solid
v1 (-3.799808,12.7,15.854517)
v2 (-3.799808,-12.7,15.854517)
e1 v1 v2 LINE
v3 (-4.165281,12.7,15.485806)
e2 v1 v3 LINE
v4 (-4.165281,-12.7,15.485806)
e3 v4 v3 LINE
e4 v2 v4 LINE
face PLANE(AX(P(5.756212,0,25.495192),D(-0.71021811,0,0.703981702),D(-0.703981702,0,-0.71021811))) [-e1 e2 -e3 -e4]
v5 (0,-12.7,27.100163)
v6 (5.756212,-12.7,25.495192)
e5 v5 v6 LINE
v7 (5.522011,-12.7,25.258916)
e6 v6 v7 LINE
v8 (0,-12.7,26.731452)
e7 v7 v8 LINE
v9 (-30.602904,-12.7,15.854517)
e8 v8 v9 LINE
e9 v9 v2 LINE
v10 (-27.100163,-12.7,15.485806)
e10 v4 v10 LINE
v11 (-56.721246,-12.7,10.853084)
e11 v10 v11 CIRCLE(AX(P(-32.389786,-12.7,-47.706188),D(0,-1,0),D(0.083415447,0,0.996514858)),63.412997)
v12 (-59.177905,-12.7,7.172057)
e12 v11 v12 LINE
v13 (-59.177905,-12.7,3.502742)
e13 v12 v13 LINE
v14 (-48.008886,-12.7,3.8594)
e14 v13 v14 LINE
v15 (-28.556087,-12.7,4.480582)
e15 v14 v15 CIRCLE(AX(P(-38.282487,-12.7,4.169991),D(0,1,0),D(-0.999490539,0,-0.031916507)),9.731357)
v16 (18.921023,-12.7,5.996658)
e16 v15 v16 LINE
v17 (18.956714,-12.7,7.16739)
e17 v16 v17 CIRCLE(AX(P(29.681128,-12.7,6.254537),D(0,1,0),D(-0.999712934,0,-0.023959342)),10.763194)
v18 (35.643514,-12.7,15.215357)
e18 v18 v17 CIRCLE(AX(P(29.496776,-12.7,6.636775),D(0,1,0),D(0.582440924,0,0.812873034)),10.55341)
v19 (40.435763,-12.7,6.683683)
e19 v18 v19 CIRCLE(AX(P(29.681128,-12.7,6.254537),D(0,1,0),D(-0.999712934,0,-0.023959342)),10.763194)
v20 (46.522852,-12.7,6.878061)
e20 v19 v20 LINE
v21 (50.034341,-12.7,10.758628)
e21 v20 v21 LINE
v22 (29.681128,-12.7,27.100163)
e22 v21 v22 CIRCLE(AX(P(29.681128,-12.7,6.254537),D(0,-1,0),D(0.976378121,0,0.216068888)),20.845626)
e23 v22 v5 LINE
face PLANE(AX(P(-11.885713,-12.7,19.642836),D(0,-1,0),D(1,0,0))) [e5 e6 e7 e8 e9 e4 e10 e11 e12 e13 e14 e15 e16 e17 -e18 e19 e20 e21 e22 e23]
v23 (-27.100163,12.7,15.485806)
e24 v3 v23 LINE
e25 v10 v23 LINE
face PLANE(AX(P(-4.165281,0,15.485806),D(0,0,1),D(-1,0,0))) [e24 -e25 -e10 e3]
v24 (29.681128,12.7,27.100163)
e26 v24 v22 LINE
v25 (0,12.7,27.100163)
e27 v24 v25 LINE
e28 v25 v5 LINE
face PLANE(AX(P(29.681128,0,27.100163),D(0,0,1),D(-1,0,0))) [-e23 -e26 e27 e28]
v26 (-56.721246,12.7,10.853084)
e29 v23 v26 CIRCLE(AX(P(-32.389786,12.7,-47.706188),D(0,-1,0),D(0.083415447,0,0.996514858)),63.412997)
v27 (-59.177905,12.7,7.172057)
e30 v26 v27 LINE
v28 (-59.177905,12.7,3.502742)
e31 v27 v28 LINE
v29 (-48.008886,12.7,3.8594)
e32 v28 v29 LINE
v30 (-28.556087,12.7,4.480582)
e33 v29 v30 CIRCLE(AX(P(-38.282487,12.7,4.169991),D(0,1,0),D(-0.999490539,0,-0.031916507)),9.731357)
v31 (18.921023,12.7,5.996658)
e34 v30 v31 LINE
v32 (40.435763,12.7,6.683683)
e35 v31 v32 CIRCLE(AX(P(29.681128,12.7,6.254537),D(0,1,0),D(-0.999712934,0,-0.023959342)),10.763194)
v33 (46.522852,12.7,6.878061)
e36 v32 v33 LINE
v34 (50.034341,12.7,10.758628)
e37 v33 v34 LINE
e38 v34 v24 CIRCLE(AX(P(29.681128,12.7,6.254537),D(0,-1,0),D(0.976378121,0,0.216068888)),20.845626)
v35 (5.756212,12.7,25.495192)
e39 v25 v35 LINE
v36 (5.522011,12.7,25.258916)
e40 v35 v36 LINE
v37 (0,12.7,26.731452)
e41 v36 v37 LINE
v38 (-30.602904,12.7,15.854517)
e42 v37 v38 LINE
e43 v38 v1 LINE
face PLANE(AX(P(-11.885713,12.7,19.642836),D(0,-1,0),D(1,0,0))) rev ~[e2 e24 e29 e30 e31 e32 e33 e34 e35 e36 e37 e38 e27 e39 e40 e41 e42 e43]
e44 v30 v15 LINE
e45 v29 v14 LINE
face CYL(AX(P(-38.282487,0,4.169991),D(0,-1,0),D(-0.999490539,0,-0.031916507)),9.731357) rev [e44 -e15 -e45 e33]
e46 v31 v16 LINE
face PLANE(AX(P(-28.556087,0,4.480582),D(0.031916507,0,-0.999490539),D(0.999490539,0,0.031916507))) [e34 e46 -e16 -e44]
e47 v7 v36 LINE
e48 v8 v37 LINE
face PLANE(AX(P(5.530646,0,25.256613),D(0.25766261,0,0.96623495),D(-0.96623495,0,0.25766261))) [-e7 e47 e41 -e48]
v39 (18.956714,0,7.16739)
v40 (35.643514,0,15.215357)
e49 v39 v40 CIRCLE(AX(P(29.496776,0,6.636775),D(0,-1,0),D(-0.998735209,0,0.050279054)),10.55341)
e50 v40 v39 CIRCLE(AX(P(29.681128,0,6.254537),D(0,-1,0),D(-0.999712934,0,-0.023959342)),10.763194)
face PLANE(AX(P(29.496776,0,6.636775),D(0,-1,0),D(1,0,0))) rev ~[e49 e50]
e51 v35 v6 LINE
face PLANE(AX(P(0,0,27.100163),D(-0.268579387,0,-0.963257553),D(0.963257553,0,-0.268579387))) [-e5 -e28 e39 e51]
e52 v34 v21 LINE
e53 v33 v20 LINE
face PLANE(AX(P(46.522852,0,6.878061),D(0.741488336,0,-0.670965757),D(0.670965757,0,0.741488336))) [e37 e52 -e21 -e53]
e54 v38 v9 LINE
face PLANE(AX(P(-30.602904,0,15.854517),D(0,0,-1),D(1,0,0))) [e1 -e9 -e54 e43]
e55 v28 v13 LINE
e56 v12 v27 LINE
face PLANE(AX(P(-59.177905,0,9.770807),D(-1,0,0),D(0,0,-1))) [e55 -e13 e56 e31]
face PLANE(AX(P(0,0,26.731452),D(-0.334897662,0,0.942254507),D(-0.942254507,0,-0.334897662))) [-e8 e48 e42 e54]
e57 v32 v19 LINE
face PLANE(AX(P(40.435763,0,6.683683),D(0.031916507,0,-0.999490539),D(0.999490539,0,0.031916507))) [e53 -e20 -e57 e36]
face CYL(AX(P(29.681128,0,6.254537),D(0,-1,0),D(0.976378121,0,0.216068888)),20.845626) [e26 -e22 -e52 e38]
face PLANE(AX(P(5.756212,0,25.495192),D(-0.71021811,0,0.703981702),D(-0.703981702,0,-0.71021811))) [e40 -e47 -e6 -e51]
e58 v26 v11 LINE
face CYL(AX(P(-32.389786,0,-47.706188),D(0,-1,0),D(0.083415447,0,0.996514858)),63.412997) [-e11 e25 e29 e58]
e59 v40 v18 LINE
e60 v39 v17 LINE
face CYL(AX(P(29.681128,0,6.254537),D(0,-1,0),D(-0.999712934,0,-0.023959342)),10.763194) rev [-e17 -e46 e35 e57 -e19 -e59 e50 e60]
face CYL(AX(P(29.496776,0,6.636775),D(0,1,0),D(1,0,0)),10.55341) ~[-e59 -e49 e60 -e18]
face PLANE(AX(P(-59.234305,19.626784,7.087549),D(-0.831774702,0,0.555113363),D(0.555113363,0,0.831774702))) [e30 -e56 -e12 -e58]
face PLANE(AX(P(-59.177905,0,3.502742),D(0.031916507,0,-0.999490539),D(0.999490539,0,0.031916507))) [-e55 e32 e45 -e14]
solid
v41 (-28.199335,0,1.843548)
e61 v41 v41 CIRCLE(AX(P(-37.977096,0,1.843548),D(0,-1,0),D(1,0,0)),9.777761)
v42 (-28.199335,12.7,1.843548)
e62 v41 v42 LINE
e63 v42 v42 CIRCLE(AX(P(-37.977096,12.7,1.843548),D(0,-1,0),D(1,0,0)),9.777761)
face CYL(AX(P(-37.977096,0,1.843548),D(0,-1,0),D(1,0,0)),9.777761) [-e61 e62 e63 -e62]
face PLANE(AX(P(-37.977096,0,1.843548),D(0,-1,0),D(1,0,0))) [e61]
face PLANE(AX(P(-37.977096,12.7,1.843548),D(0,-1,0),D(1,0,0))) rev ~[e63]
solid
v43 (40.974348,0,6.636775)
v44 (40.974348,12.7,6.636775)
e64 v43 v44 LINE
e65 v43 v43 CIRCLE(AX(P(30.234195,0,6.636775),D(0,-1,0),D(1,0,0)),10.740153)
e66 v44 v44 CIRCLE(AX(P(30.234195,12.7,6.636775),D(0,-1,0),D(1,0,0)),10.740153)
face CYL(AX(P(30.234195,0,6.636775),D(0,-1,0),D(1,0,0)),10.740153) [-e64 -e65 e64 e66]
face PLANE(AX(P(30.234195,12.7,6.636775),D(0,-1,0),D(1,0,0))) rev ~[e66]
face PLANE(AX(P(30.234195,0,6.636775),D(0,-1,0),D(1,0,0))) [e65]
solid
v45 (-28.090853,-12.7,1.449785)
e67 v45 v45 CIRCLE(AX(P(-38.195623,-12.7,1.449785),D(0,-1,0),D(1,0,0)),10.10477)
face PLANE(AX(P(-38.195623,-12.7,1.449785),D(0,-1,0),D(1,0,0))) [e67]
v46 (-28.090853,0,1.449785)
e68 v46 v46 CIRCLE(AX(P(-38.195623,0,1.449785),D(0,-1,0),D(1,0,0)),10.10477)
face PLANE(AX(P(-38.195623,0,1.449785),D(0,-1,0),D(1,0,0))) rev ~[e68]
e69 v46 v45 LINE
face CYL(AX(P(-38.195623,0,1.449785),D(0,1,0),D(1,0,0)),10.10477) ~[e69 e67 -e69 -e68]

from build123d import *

# Parameters (mm, degrees)
F1_DEPTH     = 12.7
F2_R         = 10.1047698041
F3_DEPTH     = 12.7
F4_R         = 10.5534100151
F5_DEPTH     = 12.7
F6_R         = 10.7401525204
F7_DEPTH     = 12.7
F6_R_2       = 9.7777609661
F9_DEPTH     = 12.7
F10_T1_DEPTH = 39.2535672139


# Not quite as in the source:
# - a fillet or chamfer that OpenCascade refuses, or shapes differently, is made with other operations: its cross-section is extruded or revolved along the edge and cut away or added


with BuildPart() as f1:
    # F0 (on Front) → F1 (new body, symmetric)
    with BuildSketch(Plane.XZ):
        with BuildLine():
            Line((-59.1779053211, 9.7708068788), (-59.1779053211, 3.5027421545))
            Line((-59.1779053211, 3.5027421545), (-48.0088856633, 3.8593999503))
            ThreePointArc((-48.0088856633, 3.8593999503), (-38.5930774629, 13.8963899871), (-28.5560874262, 4.4805817867))
            Line((-28.5560874262, 4.4805817867), (18.9210229876, 5.9966576886))
            ThreePointArc((18.9210229876, 5.9966576886), (29.3376039545, 17.0122475888), (40.4357630105, 6.6836830489))
            Line((40.4357630105, 6.6836830489), (46.5228520607, 6.8780606962))
            Line((46.5228520607, 6.8780606962), (50.0343405137, 10.7586279268))
            ThreePointArc((50.0343405137, 10.7586279268), (42.7319803073, 22.5092393875), (29.6811275184, 27.1001625806))
            Line((29.6811275184, 27.1001625806), (0, 27.1001625806))
            Line((0, 27.1001625806), (5.7562123984, 25.495192036))
            Line((5.7562123984, 25.495192036), (-4.165281076, 15.4858063906))
            Line((-4.165281076, 15.4858063906), (-27.1001625806, 15.4858063906))
            ThreePointArc((-27.1001625806, 15.4858063906), (-43.5123592841, 14.7237458338), (-59.1779053211, 9.7708068788))
        make_face()
    extrude(amount=F1_DEPTH, both=True)

    # F4 (on Front) → F5 (join)
    with BuildSketch(Plane.XZ):
        with Locations((29.4967759401, 6.6367746331)):
            Circle(F4_R)
    extrude(amount=F5_DEPTH)

    # F8 (on Front) → F9 (join, symmetric)
    with BuildSketch(Plane.XZ):
        Polygon((0, 26.7314519733), (-30.6029040366, 15.8545169979), (-3.687096294, 15.8545169979), (5.5306460708, 25.2566132694), align=None)
    extrude(amount=F9_DEPTH, both=True)

    # F10: chamfer of 2.54 on 1 edges, made by hand

    # F10_s2 → F10_t1 (cut)
    with BuildSketch(Plane.XZ.offset(-19.6267836069)):
        with BuildLine():
            Line((-59.2343048388, 7.087548982), (-56.66484646, 10.9375922673))
            Line((-56.66484646, 10.9375922673), (-56.6843383341, 10.9845039593))
            ThreePointArc((-56.6843383341, 10.9845039593), (-57.9365490789, 10.3887043259), (-59.1993652191, 9.8168515612))
            Line((-59.1993652191, 9.8168515612), (-59.2287053211, 9.7708068788))
            ThreePointArc((-59.2287053211, 9.7708068788), (-59.2287053211, 8.4291779304), (-59.2851048388, 7.087548982))
            Line((-59.2851048388, 7.087548982), (-59.2343048388, 7.087548982))
        make_face()
    extrude(amount=F10_T1_DEPTH, mode=Mode.SUBTRACT)


with BuildPart() as f3:
    # F2 (on Front) → F3 (new body)
    with BuildSketch(Plane.XZ):
        with Locations((-38.195622816, 1.4497848184)):
            Circle(F2_R)
    extrude(amount=F3_DEPTH)


with BuildPart() as f7:
    # F6 (on Front) → F7 (new body)
    with BuildSketch(Plane.XZ):
        with Locations((30.234195292, 6.6367746331)):
            Circle(F6_R)
    extrude(amount=-F7_DEPTH)


with BuildPart() as f7b:
    # F6 (on Front) → F7, piece 2 (new body)
    with BuildSketch(Plane.XZ):
        with Locations((-37.9770956933, 1.8435484963)):
            Circle(F6_R_2)
    extrude(amount=-F7_DEPTH)


solid = Compound([f1.part, f3.part, f7.part, f7b.part])
